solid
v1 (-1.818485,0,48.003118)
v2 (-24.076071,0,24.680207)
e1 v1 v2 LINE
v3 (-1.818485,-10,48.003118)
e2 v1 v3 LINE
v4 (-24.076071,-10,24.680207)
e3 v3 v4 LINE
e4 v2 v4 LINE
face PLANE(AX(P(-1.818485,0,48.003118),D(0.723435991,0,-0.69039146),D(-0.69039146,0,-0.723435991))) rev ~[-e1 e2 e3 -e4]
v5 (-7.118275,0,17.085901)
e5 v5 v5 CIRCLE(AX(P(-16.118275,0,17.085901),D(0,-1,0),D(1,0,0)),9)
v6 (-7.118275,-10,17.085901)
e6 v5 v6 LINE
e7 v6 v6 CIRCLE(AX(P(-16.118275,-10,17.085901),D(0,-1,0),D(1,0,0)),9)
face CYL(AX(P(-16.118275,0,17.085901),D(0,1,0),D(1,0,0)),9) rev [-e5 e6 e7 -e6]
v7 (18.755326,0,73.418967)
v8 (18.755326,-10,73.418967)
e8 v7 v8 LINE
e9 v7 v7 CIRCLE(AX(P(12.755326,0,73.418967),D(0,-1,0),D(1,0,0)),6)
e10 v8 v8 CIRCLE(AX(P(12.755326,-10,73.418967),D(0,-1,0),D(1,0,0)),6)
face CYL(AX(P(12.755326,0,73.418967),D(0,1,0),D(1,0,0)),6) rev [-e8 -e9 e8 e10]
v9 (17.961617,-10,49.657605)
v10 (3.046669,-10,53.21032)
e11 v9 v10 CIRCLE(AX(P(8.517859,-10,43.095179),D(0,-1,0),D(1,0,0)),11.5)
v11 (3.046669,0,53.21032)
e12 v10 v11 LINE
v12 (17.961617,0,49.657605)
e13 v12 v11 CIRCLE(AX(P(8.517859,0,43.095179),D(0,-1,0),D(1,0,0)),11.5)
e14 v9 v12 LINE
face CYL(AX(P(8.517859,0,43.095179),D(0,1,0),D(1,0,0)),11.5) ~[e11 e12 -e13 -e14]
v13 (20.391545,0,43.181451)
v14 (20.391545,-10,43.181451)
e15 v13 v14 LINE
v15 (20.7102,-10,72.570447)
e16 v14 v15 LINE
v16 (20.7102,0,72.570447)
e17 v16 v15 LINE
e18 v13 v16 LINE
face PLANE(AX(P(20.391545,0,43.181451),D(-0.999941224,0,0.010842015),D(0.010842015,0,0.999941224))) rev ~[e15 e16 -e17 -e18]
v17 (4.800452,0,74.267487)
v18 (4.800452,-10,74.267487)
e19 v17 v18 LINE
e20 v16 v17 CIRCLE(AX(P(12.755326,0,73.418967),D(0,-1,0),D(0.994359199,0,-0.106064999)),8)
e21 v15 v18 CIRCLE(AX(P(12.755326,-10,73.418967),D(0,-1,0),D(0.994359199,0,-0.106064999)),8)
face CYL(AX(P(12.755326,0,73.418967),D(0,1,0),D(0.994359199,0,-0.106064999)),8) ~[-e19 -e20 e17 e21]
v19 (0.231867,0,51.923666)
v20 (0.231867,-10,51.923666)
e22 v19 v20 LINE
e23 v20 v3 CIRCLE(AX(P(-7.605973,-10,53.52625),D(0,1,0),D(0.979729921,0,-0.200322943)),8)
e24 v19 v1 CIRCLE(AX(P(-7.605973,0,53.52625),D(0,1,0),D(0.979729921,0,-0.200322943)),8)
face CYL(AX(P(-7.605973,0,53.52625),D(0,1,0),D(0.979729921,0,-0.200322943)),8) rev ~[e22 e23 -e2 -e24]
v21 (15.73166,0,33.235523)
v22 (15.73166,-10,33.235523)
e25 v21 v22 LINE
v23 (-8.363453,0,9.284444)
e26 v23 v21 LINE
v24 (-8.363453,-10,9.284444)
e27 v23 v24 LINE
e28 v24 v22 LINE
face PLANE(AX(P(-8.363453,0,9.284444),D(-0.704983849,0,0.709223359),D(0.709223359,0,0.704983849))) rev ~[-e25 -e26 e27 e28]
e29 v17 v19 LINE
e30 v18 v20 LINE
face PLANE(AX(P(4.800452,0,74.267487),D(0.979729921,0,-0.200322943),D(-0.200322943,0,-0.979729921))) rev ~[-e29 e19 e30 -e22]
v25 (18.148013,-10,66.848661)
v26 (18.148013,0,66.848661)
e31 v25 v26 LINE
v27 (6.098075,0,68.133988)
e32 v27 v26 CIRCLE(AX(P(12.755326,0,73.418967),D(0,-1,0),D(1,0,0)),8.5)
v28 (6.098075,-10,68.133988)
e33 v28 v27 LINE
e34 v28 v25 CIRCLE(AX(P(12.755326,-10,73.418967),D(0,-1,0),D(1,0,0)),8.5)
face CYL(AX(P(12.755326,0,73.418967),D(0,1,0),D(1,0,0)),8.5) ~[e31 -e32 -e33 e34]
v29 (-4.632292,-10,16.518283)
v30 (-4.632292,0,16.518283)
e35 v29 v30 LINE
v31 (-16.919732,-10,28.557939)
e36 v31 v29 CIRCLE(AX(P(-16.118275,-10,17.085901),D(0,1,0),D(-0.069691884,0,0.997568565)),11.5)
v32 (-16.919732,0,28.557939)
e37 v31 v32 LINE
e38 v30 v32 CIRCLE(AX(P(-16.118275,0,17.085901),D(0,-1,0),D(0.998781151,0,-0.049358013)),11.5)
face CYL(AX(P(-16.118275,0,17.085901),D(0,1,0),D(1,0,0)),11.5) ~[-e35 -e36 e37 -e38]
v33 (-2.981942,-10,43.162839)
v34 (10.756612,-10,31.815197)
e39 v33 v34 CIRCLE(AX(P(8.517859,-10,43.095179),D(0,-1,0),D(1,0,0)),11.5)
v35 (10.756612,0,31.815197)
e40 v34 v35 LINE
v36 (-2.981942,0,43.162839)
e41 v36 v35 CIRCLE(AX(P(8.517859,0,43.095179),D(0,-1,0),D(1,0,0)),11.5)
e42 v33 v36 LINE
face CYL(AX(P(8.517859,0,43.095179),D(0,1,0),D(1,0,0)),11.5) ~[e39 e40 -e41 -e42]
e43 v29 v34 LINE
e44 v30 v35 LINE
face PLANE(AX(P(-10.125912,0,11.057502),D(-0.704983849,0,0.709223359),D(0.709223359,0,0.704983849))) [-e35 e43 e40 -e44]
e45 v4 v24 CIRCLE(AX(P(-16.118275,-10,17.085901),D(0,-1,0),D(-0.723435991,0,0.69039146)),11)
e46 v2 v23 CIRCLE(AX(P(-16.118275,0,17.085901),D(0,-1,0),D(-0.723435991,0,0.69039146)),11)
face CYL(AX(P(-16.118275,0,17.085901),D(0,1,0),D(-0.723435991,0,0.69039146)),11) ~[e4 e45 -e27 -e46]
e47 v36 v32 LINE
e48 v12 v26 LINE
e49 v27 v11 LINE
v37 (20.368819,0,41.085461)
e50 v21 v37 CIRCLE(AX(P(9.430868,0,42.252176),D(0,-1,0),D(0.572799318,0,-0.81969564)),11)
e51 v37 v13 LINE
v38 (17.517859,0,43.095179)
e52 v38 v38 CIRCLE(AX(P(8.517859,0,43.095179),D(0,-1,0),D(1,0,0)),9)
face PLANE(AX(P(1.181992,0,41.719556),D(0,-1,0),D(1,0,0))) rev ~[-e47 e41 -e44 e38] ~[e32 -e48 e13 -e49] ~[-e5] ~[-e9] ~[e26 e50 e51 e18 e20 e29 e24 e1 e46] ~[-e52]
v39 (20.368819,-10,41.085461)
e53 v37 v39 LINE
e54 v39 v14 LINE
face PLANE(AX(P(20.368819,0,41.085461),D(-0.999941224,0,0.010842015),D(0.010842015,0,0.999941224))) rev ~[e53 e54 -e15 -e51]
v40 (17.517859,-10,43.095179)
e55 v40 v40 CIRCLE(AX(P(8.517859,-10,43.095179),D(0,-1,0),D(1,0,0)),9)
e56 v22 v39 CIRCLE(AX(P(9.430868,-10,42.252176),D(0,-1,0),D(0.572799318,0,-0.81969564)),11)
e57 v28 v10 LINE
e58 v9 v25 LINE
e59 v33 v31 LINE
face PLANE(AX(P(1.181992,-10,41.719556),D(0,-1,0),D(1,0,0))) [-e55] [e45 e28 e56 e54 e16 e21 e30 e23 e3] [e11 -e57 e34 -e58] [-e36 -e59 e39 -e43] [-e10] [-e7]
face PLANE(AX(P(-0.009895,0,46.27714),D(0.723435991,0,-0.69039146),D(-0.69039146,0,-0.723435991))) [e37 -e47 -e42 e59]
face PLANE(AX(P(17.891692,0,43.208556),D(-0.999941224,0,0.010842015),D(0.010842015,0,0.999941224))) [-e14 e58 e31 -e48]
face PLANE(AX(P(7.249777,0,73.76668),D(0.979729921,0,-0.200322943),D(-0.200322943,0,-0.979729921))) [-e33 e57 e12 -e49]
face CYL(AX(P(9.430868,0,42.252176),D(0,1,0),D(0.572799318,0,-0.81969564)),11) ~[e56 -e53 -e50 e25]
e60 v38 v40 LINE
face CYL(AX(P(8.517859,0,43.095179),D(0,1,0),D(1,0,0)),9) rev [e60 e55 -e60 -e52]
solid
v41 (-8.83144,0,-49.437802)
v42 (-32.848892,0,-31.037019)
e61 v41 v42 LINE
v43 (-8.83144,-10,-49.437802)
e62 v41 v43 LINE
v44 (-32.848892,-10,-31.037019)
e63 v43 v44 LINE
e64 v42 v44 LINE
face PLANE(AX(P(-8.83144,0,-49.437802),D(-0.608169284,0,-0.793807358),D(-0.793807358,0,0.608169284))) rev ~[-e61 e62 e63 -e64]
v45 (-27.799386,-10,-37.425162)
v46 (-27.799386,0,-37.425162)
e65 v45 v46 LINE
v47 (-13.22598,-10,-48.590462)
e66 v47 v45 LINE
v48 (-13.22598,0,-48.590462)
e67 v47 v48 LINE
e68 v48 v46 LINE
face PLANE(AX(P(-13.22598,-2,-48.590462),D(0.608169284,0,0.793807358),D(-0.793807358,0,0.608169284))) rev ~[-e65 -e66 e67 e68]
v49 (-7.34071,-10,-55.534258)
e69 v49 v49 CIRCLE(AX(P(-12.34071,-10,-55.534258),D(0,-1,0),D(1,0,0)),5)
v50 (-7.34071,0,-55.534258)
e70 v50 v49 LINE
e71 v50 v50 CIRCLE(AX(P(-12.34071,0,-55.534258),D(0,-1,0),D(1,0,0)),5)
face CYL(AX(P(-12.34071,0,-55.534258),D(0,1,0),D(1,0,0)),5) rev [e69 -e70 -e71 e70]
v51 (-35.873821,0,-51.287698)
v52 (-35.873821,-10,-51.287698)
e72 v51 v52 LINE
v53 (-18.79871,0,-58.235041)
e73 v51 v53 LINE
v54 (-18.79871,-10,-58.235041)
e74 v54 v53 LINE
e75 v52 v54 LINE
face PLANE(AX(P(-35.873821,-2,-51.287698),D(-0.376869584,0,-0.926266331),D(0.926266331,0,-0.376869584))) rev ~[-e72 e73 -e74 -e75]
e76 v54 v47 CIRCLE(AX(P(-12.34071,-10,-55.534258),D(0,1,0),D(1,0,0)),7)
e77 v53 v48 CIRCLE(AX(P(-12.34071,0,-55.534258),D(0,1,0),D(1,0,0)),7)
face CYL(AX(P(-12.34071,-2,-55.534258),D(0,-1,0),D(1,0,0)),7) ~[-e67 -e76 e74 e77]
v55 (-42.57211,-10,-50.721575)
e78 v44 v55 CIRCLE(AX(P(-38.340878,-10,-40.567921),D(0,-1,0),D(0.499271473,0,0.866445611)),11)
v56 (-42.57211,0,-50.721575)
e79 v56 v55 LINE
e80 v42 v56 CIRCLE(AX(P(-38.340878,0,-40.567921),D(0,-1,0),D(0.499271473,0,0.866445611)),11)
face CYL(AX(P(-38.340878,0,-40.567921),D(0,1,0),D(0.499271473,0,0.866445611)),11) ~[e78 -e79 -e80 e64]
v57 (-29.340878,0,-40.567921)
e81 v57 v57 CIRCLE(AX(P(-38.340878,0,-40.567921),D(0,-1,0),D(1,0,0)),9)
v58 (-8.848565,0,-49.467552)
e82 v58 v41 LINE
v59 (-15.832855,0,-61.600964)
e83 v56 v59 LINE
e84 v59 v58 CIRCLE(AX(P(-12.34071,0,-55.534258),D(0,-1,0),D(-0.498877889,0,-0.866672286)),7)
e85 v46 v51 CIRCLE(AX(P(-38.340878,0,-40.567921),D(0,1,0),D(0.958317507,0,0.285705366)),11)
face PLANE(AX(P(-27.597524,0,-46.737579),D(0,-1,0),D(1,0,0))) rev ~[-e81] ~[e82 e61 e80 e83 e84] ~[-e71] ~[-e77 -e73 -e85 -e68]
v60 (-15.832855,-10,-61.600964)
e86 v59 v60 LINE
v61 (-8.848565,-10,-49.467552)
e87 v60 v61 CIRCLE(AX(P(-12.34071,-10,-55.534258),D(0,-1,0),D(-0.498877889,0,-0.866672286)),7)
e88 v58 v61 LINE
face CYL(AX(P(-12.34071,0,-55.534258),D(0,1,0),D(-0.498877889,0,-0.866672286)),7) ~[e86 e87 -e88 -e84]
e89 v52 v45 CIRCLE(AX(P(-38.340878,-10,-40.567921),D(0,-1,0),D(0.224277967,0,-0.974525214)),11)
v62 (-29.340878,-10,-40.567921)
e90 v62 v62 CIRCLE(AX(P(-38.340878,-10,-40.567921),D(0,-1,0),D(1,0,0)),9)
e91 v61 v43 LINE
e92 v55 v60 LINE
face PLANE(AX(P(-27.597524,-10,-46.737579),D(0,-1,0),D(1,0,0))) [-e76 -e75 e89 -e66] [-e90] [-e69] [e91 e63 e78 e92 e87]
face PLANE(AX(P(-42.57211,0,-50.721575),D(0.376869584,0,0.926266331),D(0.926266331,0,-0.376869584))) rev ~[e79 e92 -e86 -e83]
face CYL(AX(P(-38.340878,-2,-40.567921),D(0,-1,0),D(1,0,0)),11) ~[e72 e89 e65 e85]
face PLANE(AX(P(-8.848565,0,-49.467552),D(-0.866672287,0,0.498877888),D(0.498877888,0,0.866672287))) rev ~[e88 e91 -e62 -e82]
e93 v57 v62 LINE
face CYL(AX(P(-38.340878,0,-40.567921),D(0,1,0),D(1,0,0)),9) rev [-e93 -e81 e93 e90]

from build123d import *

# Parameters (mm, degrees)
F0_R        = 5
F0_R_2      = 9
F1_DEPTH    = 10
F2_T        = -2
F0_R_3      = 6
F3_DEPTH    = 10
F4_T        = 2.5
F4_T3_DEPTH = 15


# Not quite as in the source:
# - a shell that OpenCascade refuses in one call is made with other operations: the cavity is built on its own and cut out


with BuildPart() as f1:
    # F0 (on Front) → F1 (new body)
    with BuildSketch(Plane.XZ):
        with BuildLine():
            Line((-8.8314399067, -49.4378021172), (-32.8488921378, -31.037019376))
            ThreePointArc((-32.8488921378, -31.037019376), (-48.2033224661, -35.6963509232), (-42.5721099109, -50.7215745931))
            Line((-42.5721099109, -50.7215745931), (-15.8328549722, -61.6009637621))
            ThreePointArc((-15.8328549722, -61.6009637621), (-6.2740037455, -59.026402979), (-8.8485645285, -49.4675517523))
            Line((-8.8485645285, -49.4675517523), (-8.8314399067, -49.4378021172))
        make_face()
        with Locations((-12.3407097504, -55.5342577572)):
            Circle(F0_R, mode=Mode.SUBTRACT)
        with Locations((-38.3408783427, -40.5679210922)):
            Circle(F0_R_2, mode=Mode.SUBTRACT)
    extrude(amount=F1_DEPTH)

    # F2: a shell. OpenCascade refuses it in one call, so the cavity is built on its own and cut out:
    # the body offset inwards by the wall thickness, plus a prism from it out through each open face.
    f2_core = offset(f1.part, amount=F2_T, mode=Mode.PRIVATE)
    f2_exits = [f2_core.faces().sort_by_distance(p)[0] for p in [
        (-23.974872, -8, -48.858148),
        (-23.974872, -2, -48.858148),
    ]]
    add(f2_core, mode=Mode.SUBTRACT)
    extrude(f2_exits, amount=-F2_T, mode=Mode.SUBTRACT)


with BuildPart() as f3:
    # F0 (on Front) → F3 (new body)
    with BuildSketch(Plane.XZ):
        with BuildLine():
            Line((-1.8184846325, 48.0031181659), (-24.0760708981, 24.6802065861))
            ThreePointArc((-24.0760708981, 24.6802065861), (-23.8168254633, 9.2289086893), (-8.3634526675, 9.2844435787))
            Line((-8.3634526675, 9.2844435787), (15.7316601136, 33.2355234732))
            ThreePointArc((15.7316601136, 33.2355234732), (18.901820518, 36.6574412714), (20.3688188047, 41.0854605164))
            Line((20.3688188047, 41.0854605164), (20.3915449047, 43.1814512794))
            Line((20.3915449047, 43.1814512794), (20.7101995844, 72.5704474305))
            ThreePointArc((20.7101995844, 72.5704474305), (13.6038459907, 81.3738410149), (4.8004524063, 74.2674874211))
            Line((4.8004524063, 74.2674874211), (0.2318668126, 51.9236662992))
            ThreePointArc((0.2318668126, 51.9236662992), (-0.5168921946, 49.8188330045), (-1.8184846325, 48.0031181659))
        make_face()
        with Locations((-16.1182750016, 17.0859005302)):
            Circle(F0_R_2, mode=Mode.SUBTRACT)
        with Locations((8.5178585723, 43.0951789021)):
            Circle(F0_R_2, mode=Mode.SUBTRACT)
        with Locations((12.7553259954, 73.4189674258)):
            Circle(F0_R_3, mode=Mode.SUBTRACT)
    extrude(amount=F3_DEPTH)

    # F4: shell of thickness 2.5, made by hand


with BuildPart() as f4_core1:
    # F4_t2: copy of F3
    add(f3.part)

    # the walls: a layer under each face that stays
    f4_faces = [f4_core1.faces().sort_by_distance(p)[0] for p in [
        (18.901820518, -5, 36.6574412714),
        (6.7553259954, -5, 73.4189674258),
        (-0.4821414277, -5, 43.0951789021),
        (-25.1182750016, -5, 17.0859005302),
        (-23.8168254633, -5, 9.2289086893),
        (-12.9472777653, -5, 36.341662376),
        (-0.5168921946, -5, 49.8188330045),
        (2.5161596095, -5, 63.0955768602),
        (13.6038459907, -5, 81.3738410149),
        (20.5395091946, -5, 56.8279539735),
        (3.684103723, -5, 21.259983526),
    ]]
    thicken(f4_faces, amount=-F4_T, mode=Mode.SUBTRACT)

    # F4_s4 → F4_t3 (cut)
    with BuildSketch(Plane.XZ.offset(-2.5)):
        Polygon((15.7636046927, 33.1973004983), (14.2996618195, 35.2847625725), (14.1224923885, 35.1609574377), (13.9692004922, 35.0085818713), align=None)
        Polygon((4.7511001784, 74.2751471197), (7.2497772094, 73.7666800637), (7.27368954, 73.8836293527), (7.2863504029, 74.0023249226), align=None)
        Polygon((20.760057095, 72.5675247552), (18.2243015879, 72.8356099291), (18.2116407249, 72.7169143592), (18.2103465254, 72.5975524692), align=None)
    extrude(amount=F4_T3_DEPTH, mode=Mode.SUBTRACT)


with BuildPart() as f3_1:
    add(f3.part)

    # what is left inside the walls is the cavity
    f4_cavity = [f4_core1.part.solids().sort_by_distance(p)[0] for p in [
        (-3.08156, -0.025, 25.399802),
        (18.029816, -6.666667, 58.253404),
    ]]
    add(f4_cavity, mode=Mode.SUBTRACT)


solid = Compound([f1.part, f3_1.part])
